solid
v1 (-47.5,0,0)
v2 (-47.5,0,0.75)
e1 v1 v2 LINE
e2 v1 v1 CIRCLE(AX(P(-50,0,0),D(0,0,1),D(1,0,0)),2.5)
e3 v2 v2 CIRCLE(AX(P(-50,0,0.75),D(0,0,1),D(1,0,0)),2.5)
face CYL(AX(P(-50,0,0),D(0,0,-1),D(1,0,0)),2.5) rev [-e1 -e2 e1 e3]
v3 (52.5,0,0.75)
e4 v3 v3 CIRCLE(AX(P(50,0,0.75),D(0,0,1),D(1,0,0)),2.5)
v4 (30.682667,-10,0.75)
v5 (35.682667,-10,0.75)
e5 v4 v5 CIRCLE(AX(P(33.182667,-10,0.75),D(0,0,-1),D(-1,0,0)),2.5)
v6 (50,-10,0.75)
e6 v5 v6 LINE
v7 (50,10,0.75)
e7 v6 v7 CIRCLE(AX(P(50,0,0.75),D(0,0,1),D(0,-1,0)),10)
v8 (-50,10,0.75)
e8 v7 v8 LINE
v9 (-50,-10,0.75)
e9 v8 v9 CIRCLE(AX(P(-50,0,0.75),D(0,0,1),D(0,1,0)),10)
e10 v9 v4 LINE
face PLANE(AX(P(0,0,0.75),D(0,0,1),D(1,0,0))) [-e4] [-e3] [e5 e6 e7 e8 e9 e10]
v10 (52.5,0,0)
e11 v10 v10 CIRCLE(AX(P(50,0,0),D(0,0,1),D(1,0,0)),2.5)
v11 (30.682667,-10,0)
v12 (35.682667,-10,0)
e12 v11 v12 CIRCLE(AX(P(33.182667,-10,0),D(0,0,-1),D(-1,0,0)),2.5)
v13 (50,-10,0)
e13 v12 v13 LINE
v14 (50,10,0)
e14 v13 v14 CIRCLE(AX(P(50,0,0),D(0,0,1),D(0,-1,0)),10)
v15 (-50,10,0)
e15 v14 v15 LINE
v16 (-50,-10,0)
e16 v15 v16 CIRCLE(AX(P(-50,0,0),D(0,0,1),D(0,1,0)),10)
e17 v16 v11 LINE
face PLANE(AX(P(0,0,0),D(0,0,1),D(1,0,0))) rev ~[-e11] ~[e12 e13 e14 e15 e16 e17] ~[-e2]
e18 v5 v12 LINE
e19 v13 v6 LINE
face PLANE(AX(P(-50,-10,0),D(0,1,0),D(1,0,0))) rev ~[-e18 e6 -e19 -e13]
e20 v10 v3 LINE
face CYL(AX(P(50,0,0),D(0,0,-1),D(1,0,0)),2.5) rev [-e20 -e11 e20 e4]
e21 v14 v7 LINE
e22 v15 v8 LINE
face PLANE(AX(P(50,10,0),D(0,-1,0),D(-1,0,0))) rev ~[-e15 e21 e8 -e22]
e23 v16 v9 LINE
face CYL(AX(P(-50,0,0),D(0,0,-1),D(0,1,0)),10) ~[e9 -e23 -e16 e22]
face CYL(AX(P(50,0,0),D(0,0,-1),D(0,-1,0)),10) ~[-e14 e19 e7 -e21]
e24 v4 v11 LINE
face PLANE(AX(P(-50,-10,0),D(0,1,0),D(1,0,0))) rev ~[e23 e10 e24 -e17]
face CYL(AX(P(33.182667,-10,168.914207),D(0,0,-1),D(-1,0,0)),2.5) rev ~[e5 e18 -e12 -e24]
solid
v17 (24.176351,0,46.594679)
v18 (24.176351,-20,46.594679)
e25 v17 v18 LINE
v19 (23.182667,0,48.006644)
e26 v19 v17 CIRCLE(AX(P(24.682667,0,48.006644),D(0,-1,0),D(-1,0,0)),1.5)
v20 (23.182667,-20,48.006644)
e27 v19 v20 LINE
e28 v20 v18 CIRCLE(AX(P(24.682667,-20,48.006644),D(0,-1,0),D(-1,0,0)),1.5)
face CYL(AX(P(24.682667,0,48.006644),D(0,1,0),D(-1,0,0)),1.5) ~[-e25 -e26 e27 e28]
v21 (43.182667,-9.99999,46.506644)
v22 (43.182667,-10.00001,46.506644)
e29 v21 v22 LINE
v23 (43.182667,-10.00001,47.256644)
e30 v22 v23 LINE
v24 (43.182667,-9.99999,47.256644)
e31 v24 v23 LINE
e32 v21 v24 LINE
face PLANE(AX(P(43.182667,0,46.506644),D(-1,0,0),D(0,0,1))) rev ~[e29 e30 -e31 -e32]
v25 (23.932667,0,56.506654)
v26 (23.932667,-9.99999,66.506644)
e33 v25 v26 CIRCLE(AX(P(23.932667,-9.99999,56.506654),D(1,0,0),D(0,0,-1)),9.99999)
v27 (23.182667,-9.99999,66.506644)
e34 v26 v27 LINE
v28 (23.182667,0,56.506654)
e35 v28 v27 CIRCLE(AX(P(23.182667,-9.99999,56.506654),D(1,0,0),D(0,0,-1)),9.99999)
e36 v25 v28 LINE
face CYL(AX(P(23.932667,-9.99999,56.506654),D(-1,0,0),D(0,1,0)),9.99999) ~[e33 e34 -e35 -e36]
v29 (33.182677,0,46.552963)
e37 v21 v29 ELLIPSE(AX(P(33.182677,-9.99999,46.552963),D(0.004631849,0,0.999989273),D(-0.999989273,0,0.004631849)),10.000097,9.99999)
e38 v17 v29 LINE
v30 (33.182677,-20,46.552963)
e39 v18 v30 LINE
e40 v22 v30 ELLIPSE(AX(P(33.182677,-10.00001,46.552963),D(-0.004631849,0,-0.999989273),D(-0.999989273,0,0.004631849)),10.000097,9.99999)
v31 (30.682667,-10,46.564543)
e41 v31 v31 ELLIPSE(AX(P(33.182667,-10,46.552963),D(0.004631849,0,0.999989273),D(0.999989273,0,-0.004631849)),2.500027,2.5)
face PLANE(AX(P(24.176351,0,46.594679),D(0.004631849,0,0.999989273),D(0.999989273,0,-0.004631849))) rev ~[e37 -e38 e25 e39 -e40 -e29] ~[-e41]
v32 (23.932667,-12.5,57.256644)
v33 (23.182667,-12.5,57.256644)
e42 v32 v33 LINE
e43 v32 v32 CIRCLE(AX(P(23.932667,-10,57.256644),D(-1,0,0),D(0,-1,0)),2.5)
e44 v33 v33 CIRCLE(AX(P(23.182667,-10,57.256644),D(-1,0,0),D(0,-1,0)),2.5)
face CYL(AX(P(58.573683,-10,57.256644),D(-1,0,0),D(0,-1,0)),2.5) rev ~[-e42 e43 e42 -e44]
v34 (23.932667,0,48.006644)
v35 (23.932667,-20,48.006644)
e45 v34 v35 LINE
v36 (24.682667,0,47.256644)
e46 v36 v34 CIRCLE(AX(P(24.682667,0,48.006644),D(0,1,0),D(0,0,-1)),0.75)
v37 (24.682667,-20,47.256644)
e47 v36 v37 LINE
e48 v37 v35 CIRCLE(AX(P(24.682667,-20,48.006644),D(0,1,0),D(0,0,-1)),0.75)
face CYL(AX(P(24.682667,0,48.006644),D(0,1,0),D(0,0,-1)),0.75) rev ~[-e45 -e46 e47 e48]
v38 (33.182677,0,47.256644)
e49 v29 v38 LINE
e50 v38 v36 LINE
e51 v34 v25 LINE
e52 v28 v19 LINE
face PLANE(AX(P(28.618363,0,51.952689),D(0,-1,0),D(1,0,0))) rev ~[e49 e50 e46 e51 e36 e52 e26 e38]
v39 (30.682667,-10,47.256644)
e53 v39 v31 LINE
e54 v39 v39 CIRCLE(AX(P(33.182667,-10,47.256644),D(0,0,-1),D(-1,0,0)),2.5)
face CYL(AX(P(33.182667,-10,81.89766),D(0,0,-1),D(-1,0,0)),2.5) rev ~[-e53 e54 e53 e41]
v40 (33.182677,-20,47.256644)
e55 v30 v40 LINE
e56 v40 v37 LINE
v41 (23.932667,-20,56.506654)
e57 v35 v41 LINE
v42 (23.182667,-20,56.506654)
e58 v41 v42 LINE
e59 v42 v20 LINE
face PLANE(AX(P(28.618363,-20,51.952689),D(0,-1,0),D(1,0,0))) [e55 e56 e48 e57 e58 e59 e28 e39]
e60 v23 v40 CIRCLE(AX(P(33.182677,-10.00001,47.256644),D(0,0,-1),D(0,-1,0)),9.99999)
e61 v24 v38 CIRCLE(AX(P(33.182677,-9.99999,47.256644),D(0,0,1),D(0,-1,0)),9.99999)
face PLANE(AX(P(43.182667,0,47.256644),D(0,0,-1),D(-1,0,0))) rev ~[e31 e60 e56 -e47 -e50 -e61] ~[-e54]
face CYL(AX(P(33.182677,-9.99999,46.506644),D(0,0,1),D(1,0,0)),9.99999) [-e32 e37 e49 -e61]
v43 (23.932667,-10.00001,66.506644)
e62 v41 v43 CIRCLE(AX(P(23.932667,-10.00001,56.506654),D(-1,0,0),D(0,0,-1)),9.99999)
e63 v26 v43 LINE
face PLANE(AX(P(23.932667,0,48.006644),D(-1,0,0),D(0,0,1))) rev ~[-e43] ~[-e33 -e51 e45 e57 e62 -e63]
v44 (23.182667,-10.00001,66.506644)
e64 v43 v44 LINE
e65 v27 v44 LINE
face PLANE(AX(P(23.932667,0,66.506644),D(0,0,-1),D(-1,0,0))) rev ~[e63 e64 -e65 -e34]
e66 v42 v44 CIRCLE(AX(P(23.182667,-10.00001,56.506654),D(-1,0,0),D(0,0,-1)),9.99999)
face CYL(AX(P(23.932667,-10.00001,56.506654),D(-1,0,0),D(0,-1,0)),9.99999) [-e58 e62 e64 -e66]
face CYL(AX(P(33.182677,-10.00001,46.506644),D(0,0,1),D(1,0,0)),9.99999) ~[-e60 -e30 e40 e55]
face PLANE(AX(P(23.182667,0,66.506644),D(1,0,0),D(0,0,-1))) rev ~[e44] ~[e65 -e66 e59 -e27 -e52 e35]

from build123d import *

# Parameters (mm, degrees)
F0_R     = 2.5
F1_DEPTH = 0.75
F3_DEPTH = 20
F5_D     = 5
F5_2_D   = 5
F7_D     = 5
F8_R     = 9.99999


# Not quite as in the source:
# - a fillet or chamfer is up to 0.001 mm smaller than in the source, because OpenCascade refuses the exact size


with BuildPart() as f1:
    # F0 (on Top) → F1 (new body)
    with BuildSketch(Plane.XY):
        with BuildLine():
            ThreePointArc((50, -10), (60, 0), (50, 10))
            Line((50, 10), (-50, 10))
            ThreePointArc((-50, 10), (-60, 0), (-50, -10))
            Line((-50, -10), (50, -10))
        make_face()
        with Locations((-50, 0)):
            Circle(F0_R, mode=Mode.SUBTRACT)
        with Locations((50, 0)):
            Circle(F0_R, mode=Mode.SUBTRACT)
    extrude(amount=F1_DEPTH)

    # F5 (through all)
    with Locations(Plane.XY.offset(47.2566441149)):
        with Locations((33.1826669741, -10)):
            Hole(F5_D / 2)


with BuildPart() as f3:
    # F2 (on Front) → F3 (new body)
    with BuildSketch(Plane.XZ):
        with BuildLine():
            Line((43.1826669741, 47.2566441149), (24.6826669741, 47.2566441149))
            ThreePointArc((24.6826669741, 47.2566441149), (24.1523368882, 47.476314029), (23.9326669741, 48.0066441149))
            Line((23.9326669741, 48.0066441149), (23.9326669741, 66.5066441149))
            Line((23.9326669741, 66.5066441149), (23.1826669741, 66.5066441149))
            Line((23.1826669741, 66.5066441149), (23.1826669741, 48.0066441149))
            ThreePointArc((23.1826669741, 48.0066441149), (23.4559897983, 47.1433578897), (24.176351116, 46.5946794369))
            Line((24.176351116, 46.5946794369), (43.1826669741, 46.5066441149))
            Line((43.1826669741, 46.5066441149), (43.1826669741, 47.2566441149))
        make_face()
    extrude(amount=F3_DEPTH)

    # F5#2 (through all)
    with Locations(Plane.XY.offset(47.2566441149)):
        with Locations((33.1826669741, -10)):
            Hole(F5_2_D / 2)

    # F7 (through all)
    with Locations(Plane.YZ.offset(23.9326669741)):
        with Locations((-10, 57.2566441149)):
            Hole(F7_D / 2)

    # F8 (radius 10 in the source; OpenCascade refuses exactly that, so slightly less here)
    f8_edges = [f3.edges().sort_by_distance(p)[0] for p in [
        (23.557667, -20, 66.506644),
        (23.557667, 0, 66.506644),
        (43.182667, -20, 46.881644),
        (43.182667, 0, 46.881644),
    ]]
    fillet(f8_edges, radius=F8_R)


solid = Compound([f1.part, f3.part])
